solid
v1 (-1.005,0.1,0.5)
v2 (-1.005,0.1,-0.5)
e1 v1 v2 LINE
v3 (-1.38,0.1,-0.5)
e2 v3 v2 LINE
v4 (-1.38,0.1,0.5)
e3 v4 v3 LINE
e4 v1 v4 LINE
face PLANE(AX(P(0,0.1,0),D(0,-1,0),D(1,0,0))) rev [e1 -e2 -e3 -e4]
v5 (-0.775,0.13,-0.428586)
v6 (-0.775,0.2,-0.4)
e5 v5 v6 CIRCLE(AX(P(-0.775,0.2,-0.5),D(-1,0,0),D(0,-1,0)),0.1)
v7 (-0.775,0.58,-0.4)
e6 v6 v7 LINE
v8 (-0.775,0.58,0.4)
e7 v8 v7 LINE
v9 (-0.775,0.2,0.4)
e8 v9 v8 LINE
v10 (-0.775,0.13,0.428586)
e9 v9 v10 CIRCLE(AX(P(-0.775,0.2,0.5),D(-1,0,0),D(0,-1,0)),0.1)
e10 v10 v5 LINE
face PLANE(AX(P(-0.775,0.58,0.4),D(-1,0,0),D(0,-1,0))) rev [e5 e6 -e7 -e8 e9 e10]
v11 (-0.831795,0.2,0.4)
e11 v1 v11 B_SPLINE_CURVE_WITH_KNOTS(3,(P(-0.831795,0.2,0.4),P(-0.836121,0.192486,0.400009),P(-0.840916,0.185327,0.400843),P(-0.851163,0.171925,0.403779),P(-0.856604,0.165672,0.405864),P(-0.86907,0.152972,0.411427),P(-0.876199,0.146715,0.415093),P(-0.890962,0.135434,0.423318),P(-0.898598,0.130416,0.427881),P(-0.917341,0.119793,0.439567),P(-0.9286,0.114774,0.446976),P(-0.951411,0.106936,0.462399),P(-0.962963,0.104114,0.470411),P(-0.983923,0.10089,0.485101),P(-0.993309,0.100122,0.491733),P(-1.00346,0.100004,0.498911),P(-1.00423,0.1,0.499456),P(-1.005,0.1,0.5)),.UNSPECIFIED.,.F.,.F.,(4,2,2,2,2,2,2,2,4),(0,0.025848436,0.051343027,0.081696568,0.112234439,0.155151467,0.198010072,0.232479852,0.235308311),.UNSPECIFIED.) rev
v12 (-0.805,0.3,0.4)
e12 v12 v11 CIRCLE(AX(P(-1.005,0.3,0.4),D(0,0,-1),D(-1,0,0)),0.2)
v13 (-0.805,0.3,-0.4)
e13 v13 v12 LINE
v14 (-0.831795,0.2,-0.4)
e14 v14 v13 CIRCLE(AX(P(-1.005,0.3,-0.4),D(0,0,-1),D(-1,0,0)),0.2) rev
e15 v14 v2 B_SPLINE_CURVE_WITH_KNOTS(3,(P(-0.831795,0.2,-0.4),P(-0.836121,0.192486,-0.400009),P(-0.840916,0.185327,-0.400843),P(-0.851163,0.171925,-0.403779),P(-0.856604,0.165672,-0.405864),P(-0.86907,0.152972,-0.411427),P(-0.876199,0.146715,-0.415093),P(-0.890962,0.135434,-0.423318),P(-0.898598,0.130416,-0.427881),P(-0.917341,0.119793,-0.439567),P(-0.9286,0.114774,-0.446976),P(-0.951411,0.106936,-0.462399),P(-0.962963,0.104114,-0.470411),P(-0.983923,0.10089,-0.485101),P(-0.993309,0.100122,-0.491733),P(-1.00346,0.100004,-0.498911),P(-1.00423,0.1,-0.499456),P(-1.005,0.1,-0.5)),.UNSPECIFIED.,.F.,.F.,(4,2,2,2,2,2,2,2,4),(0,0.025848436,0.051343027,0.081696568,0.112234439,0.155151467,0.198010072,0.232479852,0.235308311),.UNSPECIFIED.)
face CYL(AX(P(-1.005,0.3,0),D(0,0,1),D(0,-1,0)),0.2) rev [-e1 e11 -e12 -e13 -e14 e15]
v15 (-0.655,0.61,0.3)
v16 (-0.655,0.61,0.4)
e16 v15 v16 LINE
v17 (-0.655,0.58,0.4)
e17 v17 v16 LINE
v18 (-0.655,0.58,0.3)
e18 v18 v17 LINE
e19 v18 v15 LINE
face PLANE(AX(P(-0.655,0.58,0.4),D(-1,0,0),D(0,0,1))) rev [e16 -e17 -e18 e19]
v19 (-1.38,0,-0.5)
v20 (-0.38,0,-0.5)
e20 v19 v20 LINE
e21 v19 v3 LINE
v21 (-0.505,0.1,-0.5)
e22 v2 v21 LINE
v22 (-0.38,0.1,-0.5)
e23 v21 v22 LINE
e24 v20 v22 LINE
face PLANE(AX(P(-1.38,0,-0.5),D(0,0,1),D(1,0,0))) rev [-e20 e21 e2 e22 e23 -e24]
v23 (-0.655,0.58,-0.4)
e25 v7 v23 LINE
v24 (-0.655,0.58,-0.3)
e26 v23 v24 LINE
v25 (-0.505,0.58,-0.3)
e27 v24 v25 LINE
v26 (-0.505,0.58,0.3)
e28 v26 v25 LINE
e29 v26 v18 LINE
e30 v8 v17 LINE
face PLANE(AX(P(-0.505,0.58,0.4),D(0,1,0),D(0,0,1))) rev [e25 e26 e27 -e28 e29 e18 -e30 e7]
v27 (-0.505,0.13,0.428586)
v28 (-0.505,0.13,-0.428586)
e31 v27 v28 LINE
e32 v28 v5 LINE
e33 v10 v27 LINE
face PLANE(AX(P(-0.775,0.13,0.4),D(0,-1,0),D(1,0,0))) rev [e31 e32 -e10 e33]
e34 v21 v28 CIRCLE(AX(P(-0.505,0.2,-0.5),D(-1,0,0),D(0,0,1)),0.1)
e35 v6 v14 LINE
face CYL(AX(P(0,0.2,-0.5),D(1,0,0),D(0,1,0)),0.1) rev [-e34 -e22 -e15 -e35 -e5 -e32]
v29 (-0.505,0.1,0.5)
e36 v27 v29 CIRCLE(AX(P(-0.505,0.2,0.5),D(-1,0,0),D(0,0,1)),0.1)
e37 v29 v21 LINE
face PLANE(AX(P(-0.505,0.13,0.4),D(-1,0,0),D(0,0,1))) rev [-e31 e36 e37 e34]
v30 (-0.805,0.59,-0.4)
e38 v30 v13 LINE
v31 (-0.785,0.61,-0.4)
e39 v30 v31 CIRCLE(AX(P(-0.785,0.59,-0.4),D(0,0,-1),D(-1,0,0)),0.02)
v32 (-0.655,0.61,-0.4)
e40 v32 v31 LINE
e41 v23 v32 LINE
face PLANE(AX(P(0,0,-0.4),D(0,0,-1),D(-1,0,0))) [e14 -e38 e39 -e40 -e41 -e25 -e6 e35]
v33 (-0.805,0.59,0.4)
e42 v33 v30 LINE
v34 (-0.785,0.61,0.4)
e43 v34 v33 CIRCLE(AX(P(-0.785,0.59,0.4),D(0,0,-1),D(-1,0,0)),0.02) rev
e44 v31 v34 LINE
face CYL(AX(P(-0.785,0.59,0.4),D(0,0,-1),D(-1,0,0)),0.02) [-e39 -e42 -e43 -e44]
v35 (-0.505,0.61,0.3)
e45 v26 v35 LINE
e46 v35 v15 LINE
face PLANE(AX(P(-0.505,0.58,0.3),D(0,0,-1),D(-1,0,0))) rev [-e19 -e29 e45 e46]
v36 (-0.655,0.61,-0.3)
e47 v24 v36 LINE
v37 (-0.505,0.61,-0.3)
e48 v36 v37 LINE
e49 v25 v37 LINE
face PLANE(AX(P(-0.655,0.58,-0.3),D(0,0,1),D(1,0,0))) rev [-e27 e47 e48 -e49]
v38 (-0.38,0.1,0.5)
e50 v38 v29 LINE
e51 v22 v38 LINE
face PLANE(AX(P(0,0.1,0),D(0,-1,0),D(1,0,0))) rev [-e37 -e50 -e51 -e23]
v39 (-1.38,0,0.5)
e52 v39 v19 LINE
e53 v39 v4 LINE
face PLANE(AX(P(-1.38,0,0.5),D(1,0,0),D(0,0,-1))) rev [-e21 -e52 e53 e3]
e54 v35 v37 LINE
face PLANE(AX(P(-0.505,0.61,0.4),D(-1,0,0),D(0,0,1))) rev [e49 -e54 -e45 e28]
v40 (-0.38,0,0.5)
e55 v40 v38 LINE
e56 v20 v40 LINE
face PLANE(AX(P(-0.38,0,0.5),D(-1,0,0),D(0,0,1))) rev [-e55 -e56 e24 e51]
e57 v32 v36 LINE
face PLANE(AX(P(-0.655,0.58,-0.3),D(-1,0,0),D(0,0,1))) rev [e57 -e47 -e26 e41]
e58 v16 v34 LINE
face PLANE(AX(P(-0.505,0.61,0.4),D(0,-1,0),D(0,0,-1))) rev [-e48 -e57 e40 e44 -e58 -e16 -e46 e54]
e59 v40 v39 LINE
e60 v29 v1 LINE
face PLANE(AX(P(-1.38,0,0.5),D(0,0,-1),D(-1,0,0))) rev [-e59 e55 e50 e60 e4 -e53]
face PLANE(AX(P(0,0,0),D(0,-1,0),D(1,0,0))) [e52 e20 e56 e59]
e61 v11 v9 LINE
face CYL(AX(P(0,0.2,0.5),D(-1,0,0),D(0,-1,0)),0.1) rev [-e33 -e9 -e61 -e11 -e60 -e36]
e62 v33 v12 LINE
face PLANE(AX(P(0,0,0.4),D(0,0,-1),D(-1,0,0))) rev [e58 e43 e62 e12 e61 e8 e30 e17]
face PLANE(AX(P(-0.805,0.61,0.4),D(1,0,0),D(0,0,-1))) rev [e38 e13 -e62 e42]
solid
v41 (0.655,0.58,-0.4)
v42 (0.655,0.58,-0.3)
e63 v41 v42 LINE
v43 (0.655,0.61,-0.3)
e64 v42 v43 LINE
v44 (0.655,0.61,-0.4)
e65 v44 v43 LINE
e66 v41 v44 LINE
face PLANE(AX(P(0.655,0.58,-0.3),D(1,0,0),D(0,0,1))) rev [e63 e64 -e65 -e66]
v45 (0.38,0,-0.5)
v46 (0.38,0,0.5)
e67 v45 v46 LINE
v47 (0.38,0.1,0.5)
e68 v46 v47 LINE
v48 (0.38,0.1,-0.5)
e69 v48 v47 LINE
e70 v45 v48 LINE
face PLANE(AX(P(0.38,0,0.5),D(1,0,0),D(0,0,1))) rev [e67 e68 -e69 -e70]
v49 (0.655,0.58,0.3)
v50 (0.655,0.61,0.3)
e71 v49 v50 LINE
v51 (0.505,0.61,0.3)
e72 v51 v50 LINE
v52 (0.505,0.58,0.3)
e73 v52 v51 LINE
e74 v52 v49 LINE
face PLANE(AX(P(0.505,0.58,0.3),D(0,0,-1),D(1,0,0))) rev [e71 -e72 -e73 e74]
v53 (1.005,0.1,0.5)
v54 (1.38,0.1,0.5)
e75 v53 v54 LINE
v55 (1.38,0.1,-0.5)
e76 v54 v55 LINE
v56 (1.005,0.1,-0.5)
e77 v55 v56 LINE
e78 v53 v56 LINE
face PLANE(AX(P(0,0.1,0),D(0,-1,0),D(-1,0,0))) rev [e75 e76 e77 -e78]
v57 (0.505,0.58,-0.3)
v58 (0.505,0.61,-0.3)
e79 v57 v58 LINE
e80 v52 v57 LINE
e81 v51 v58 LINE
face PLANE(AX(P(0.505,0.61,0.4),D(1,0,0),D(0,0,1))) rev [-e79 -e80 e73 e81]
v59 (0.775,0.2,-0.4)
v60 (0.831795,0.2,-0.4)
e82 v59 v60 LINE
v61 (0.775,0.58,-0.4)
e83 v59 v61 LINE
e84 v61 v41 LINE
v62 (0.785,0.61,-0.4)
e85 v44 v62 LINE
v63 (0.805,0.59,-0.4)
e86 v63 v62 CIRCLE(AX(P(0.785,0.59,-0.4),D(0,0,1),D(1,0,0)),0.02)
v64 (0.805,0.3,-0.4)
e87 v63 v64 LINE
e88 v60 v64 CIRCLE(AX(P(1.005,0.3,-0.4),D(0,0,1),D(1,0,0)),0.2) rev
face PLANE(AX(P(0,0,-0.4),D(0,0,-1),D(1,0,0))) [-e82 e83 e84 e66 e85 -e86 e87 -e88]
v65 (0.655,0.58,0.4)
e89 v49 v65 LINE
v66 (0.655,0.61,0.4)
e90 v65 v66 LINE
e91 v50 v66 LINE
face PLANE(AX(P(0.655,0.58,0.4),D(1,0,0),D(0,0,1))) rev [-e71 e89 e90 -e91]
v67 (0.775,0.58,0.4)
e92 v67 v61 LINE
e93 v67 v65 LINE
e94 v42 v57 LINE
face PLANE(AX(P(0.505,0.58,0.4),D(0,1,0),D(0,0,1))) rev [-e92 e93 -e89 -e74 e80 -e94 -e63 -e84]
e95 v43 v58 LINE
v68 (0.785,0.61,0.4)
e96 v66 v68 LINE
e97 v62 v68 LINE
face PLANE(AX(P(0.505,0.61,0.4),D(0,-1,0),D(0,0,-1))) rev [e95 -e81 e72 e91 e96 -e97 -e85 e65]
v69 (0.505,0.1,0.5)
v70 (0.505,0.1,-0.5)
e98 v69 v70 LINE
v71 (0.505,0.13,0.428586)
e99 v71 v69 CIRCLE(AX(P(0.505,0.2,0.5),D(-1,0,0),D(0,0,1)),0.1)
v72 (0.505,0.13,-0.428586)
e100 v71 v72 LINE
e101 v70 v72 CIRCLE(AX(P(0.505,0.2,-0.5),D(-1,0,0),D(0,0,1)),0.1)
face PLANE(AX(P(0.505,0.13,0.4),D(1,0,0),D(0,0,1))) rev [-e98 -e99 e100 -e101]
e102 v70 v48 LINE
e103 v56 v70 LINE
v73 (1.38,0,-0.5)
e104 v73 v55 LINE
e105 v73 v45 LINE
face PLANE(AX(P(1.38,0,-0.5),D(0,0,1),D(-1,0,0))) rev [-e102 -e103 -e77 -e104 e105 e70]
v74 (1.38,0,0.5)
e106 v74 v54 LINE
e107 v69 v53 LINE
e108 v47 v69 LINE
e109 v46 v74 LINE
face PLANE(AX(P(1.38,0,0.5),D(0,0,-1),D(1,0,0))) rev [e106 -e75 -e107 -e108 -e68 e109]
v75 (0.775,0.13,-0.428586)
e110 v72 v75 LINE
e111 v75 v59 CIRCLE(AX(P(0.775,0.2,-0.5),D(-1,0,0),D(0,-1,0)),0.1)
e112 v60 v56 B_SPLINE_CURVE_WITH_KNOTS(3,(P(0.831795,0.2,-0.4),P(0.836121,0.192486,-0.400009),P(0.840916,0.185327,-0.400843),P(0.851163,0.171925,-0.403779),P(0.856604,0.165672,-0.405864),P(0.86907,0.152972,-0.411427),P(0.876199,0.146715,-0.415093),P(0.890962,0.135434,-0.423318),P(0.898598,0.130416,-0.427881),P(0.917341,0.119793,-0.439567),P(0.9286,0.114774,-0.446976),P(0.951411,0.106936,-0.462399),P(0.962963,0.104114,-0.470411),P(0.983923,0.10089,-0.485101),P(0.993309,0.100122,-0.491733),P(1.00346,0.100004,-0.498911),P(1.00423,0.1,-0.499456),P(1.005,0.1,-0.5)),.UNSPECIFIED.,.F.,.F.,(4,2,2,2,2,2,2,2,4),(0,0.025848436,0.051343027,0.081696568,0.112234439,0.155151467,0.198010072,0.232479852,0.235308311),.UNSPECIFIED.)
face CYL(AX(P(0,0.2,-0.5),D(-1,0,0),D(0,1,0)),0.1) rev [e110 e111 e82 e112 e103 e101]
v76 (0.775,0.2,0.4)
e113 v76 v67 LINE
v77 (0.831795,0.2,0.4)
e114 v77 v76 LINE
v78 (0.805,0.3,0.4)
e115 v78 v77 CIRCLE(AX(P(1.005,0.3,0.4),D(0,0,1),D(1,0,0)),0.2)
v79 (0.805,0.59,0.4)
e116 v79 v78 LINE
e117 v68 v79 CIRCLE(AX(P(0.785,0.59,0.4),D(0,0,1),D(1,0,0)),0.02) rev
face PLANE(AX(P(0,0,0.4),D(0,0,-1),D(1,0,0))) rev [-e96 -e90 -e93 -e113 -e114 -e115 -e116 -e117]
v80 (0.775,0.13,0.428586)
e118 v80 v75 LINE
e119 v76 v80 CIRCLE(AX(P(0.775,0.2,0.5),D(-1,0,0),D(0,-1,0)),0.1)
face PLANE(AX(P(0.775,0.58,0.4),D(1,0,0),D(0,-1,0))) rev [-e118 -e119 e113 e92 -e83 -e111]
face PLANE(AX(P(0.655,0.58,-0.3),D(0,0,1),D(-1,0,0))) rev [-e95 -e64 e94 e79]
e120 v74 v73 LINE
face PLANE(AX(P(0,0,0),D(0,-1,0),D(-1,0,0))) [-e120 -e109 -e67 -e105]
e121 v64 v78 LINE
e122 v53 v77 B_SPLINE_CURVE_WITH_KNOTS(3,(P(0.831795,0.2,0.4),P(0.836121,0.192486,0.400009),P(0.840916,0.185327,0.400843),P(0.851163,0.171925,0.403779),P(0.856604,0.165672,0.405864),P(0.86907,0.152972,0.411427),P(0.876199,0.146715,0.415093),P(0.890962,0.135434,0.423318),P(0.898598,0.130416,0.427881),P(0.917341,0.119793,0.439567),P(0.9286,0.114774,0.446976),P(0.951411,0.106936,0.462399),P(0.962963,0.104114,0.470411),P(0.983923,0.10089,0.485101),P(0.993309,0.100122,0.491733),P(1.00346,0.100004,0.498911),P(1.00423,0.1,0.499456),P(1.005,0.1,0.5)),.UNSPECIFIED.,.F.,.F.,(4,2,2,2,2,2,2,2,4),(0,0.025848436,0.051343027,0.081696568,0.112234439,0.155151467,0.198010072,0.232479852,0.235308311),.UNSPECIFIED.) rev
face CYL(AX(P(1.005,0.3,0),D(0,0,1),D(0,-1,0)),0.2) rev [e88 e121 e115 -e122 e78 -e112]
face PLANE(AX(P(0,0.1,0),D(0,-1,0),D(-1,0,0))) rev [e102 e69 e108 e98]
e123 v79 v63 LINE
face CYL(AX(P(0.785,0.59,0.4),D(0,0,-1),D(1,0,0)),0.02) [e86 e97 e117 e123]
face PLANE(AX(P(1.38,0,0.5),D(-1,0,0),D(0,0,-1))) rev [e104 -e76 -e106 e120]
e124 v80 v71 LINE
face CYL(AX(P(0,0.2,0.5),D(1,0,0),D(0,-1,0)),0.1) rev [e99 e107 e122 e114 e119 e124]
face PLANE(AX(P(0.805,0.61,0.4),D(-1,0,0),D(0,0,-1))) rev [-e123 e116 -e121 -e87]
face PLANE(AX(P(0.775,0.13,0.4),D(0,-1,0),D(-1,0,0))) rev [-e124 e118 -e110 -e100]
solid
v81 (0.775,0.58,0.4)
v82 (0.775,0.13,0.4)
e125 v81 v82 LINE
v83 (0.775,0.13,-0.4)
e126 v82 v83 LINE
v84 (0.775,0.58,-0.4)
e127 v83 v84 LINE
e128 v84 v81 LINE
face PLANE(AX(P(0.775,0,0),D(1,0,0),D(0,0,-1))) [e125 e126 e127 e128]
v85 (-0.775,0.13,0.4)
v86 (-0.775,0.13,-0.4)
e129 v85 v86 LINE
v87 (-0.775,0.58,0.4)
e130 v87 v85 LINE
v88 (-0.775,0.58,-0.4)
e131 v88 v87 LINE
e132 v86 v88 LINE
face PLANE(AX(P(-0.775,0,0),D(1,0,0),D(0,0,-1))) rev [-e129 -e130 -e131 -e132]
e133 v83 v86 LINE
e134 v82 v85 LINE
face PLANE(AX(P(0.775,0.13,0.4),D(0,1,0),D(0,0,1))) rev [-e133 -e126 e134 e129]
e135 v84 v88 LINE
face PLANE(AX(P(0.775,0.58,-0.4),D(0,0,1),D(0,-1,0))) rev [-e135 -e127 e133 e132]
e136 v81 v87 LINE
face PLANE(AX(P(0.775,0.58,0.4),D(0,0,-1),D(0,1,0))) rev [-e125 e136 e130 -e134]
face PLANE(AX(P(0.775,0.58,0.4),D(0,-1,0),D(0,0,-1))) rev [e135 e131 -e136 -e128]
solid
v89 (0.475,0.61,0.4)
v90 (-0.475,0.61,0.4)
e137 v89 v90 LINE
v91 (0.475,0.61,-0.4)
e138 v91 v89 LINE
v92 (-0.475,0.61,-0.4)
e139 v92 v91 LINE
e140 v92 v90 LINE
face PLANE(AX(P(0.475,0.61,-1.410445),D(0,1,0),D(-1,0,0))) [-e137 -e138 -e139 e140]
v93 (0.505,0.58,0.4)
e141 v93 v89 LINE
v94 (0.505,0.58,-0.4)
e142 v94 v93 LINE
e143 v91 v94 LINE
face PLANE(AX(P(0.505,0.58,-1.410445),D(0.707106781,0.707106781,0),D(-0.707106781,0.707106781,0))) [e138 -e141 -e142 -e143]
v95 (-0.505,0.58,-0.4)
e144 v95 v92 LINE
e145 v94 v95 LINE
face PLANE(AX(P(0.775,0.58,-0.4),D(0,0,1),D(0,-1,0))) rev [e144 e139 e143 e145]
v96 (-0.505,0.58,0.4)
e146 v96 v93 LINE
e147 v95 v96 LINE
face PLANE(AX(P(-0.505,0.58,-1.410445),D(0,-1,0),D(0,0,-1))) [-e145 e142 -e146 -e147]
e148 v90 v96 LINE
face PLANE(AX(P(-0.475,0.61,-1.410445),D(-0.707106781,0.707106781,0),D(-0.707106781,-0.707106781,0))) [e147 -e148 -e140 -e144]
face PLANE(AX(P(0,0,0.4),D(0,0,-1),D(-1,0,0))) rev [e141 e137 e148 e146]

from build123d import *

# Parameters (mm, degrees)
SKETCH1_W           = 0.8
SKETCH1_H           = 0.45
BOSS_EXTRUDE1_DEPTH = 0.775
BOSS_EXTRUDE2_DEPTH = 0.4
FILLET1_R           = 0.02
SKETCH3_W           = 0.15
SKETCH3_H           = 0.1
CUT_EXTRUDE1_DEPTH  = 0.03
SKETCH6_W           = 1
SKETCH6_H           = 1
BOSS_EXTRUDE5_DEPTH = 0.1
FILLET2_R           = 0.2
FILLET3_START       = -0.862971281
FILLET3_DEPTH       = 0.087971281
FILLET3_START_2     = -0.8049999
FILLET3_2_DEPTH     = 0.2999999
FILLET3_START_3     = -1.0050001
FILLET3_3_DEPTH     = 0.142028819
FILLET3_START_4     = -2
FILLET3_4_OUTLINE_W = 0.27
FILLET3_4_OUTLINE_H = 0.07
FILLET3_4_DEPTH     = 3
BOSS_EXTRUDE6_DEPTH = 0.8


with BuildPart() as part:
    # Sketch1 → Boss-Extrude1 (new, symmetric)
    with BuildSketch(Plane(origin=(0, 0, 0), x_dir=(0, 0, -1), z_dir=(1, 0, 0))):
        with Locations((0, 0.355)):
            Rectangle(SKETCH1_W, SKETCH1_H)
    extrude(amount=BOSS_EXTRUDE1_DEPTH, both=True)


with BuildPart() as body_2:
    # Sketch2 → Boss-Extrude2 (new, symmetric)
    with BuildSketch(Plane.XY):
        Polygon((-0.505, 0.58), (-0.775, 0.58), (-0.775, 0.13), (-0.505, 0.13), (-0.505, 0.1), (-0.805, 0.1), (-0.805, 0.61), (-0.505, 0.61), align=None)
    extrude(amount=BOSS_EXTRUDE2_DEPTH, both=True)

    # Fillet1
    fillet1_edges = [body_2.edges().sort_by_distance(p)[0] for p in [
        (-0.805, 0.61, 0),
    ]]
    fillet(fillet1_edges, radius=FILLET1_R)

    # Sketch3 → Cut-Extrude1 (cut)
    with BuildSketch(Plane(origin=(0, 0.61, 0), x_dir=(1, 0, 0), z_dir=(0, 1, 0))):
        with Locations((-0.58, 0.35)):
            Rectangle(SKETCH3_W, SKETCH3_H)
        with Locations((-0.58, -0.35)):
            Rectangle(SKETCH3_W, SKETCH3_H)
    extrude(amount=-CUT_EXTRUDE1_DEPTH, mode=Mode.SUBTRACT)

    # Sketch6 → Boss-Extrude5 (add)
    with BuildSketch(Plane.XZ.offset(-0.1)):
        with Locations((-0.88, 0)):
            Rectangle(SKETCH6_W, SKETCH6_H)
    extrude(amount=BOSS_EXTRUDE5_DEPTH)

    # Fillet2
    fillet2_edges = [body_2.edges().sort_by_distance(p)[0] for p in [
        (-0.805, 0.1, 0),
    ]]
    fillet(fillet2_edges, radius=FILLET2_R)

    # Fillet3: read off the stored shape, not the designer's step
    # Fillet3 outline → Fillet3 (add)
    with BuildSketch(Plane.YZ.offset(FILLET3_START)):
        with BuildLine():
            Line((0.1, 0.5), (0.1, 0.4))
            Line((0.1, 0.4), (0.2, 0.4))
            ThreePointArc((0.2, 0.4), (0.129289322, 0.429289322), (0.1, 0.5))
        make_face()
        with BuildLine():
            ThreePointArc((0.1, -0.5), (0.129289322, -0.429289322), (0.2, -0.4))
            Line((0.2, -0.4), (0.1, -0.4))
            Line((0.1, -0.4), (0.1, -0.5))
        make_face()
    extrude(amount=FILLET3_DEPTH)

    # Fillet3 2 outline → Fillet3 2 (add)
    with BuildSketch(Plane.YZ.offset(FILLET3_START_2)):
        with BuildLine():
            Line((0.1, 0.5), (0.1, 0.4))
            Line((0.1, 0.4), (0.2, 0.4))
            ThreePointArc((0.2, 0.4), (0.129289322, 0.429289322), (0.1, 0.5))
        make_face()
        with BuildLine():
            ThreePointArc((0.1, -0.5), (0.129289322, -0.429289322), (0.2, -0.4))
            Line((0.2, -0.4), (0.1, -0.4))
            Line((0.1, -0.4), (0.1, -0.5))
        make_face()
    extrude(amount=FILLET3_2_DEPTH)

    # Fillet3 3 outline → Fillet3 3 (add)
    with BuildSketch(Plane.YZ.offset(FILLET3_START_3)):
        with BuildLine():
            Line((0.1, 0.5), (0.1, 0.4))
            Line((0.1, 0.4), (0.2, 0.4))
            ThreePointArc((0.2, 0.4), (0.129289322, 0.429289322), (0.1, 0.5))
        make_face()
        with BuildLine():
            ThreePointArc((0.1, -0.5), (0.129289322, -0.429289322), (0.2, -0.4))
            Line((0.2, -0.4), (0.1, -0.4))
            Line((0.1, -0.4), (0.1, -0.5))
        make_face()
    extrude(amount=FILLET3_3_DEPTH)

    # Fillet3 4 outline → Fillet3 4 (cut)
    with BuildSketch(Plane.XY.offset(FILLET3_START_4)):
        with BuildLine():
            Line((-1.0050001, 0.2), (-1.00500005, 0.1))
            ThreePointArc((-1.00500005, 0.1), (-0.905000022, 0.126794907), (-0.831794919, 0.2))
            Line((-0.831794919, 0.2), (-1.0050001, 0.2))
        make_face()
        with Locations((-0.64, 0.165)):
            Rectangle(FILLET3_4_OUTLINE_W, FILLET3_4_OUTLINE_H)
    extrude(amount=FILLET3_4_DEPTH, mode=Mode.SUBTRACT)


with BuildPart() as body_3:
    # Mirror2: mirrored copy
    add(body_2.part.mirror(Plane(origin=(0, 0, 0), x_dir=(0, 0, 1), z_dir=(1, 0, 0))))


with BuildPart() as body_4:
    # Sketch7 → Boss-Extrude6 (new body)
    with BuildSketch(Plane.XY.offset(0.4)):
        Polygon((-0.505, 0.58), (0.505, 0.58), (0.475, 0.61), (-0.475, 0.61), align=None)
    extrude(amount=-BOSS_EXTRUDE6_DEPTH)


solid = Compound([part.part, body_2.part, body_3.part, body_4.part])
